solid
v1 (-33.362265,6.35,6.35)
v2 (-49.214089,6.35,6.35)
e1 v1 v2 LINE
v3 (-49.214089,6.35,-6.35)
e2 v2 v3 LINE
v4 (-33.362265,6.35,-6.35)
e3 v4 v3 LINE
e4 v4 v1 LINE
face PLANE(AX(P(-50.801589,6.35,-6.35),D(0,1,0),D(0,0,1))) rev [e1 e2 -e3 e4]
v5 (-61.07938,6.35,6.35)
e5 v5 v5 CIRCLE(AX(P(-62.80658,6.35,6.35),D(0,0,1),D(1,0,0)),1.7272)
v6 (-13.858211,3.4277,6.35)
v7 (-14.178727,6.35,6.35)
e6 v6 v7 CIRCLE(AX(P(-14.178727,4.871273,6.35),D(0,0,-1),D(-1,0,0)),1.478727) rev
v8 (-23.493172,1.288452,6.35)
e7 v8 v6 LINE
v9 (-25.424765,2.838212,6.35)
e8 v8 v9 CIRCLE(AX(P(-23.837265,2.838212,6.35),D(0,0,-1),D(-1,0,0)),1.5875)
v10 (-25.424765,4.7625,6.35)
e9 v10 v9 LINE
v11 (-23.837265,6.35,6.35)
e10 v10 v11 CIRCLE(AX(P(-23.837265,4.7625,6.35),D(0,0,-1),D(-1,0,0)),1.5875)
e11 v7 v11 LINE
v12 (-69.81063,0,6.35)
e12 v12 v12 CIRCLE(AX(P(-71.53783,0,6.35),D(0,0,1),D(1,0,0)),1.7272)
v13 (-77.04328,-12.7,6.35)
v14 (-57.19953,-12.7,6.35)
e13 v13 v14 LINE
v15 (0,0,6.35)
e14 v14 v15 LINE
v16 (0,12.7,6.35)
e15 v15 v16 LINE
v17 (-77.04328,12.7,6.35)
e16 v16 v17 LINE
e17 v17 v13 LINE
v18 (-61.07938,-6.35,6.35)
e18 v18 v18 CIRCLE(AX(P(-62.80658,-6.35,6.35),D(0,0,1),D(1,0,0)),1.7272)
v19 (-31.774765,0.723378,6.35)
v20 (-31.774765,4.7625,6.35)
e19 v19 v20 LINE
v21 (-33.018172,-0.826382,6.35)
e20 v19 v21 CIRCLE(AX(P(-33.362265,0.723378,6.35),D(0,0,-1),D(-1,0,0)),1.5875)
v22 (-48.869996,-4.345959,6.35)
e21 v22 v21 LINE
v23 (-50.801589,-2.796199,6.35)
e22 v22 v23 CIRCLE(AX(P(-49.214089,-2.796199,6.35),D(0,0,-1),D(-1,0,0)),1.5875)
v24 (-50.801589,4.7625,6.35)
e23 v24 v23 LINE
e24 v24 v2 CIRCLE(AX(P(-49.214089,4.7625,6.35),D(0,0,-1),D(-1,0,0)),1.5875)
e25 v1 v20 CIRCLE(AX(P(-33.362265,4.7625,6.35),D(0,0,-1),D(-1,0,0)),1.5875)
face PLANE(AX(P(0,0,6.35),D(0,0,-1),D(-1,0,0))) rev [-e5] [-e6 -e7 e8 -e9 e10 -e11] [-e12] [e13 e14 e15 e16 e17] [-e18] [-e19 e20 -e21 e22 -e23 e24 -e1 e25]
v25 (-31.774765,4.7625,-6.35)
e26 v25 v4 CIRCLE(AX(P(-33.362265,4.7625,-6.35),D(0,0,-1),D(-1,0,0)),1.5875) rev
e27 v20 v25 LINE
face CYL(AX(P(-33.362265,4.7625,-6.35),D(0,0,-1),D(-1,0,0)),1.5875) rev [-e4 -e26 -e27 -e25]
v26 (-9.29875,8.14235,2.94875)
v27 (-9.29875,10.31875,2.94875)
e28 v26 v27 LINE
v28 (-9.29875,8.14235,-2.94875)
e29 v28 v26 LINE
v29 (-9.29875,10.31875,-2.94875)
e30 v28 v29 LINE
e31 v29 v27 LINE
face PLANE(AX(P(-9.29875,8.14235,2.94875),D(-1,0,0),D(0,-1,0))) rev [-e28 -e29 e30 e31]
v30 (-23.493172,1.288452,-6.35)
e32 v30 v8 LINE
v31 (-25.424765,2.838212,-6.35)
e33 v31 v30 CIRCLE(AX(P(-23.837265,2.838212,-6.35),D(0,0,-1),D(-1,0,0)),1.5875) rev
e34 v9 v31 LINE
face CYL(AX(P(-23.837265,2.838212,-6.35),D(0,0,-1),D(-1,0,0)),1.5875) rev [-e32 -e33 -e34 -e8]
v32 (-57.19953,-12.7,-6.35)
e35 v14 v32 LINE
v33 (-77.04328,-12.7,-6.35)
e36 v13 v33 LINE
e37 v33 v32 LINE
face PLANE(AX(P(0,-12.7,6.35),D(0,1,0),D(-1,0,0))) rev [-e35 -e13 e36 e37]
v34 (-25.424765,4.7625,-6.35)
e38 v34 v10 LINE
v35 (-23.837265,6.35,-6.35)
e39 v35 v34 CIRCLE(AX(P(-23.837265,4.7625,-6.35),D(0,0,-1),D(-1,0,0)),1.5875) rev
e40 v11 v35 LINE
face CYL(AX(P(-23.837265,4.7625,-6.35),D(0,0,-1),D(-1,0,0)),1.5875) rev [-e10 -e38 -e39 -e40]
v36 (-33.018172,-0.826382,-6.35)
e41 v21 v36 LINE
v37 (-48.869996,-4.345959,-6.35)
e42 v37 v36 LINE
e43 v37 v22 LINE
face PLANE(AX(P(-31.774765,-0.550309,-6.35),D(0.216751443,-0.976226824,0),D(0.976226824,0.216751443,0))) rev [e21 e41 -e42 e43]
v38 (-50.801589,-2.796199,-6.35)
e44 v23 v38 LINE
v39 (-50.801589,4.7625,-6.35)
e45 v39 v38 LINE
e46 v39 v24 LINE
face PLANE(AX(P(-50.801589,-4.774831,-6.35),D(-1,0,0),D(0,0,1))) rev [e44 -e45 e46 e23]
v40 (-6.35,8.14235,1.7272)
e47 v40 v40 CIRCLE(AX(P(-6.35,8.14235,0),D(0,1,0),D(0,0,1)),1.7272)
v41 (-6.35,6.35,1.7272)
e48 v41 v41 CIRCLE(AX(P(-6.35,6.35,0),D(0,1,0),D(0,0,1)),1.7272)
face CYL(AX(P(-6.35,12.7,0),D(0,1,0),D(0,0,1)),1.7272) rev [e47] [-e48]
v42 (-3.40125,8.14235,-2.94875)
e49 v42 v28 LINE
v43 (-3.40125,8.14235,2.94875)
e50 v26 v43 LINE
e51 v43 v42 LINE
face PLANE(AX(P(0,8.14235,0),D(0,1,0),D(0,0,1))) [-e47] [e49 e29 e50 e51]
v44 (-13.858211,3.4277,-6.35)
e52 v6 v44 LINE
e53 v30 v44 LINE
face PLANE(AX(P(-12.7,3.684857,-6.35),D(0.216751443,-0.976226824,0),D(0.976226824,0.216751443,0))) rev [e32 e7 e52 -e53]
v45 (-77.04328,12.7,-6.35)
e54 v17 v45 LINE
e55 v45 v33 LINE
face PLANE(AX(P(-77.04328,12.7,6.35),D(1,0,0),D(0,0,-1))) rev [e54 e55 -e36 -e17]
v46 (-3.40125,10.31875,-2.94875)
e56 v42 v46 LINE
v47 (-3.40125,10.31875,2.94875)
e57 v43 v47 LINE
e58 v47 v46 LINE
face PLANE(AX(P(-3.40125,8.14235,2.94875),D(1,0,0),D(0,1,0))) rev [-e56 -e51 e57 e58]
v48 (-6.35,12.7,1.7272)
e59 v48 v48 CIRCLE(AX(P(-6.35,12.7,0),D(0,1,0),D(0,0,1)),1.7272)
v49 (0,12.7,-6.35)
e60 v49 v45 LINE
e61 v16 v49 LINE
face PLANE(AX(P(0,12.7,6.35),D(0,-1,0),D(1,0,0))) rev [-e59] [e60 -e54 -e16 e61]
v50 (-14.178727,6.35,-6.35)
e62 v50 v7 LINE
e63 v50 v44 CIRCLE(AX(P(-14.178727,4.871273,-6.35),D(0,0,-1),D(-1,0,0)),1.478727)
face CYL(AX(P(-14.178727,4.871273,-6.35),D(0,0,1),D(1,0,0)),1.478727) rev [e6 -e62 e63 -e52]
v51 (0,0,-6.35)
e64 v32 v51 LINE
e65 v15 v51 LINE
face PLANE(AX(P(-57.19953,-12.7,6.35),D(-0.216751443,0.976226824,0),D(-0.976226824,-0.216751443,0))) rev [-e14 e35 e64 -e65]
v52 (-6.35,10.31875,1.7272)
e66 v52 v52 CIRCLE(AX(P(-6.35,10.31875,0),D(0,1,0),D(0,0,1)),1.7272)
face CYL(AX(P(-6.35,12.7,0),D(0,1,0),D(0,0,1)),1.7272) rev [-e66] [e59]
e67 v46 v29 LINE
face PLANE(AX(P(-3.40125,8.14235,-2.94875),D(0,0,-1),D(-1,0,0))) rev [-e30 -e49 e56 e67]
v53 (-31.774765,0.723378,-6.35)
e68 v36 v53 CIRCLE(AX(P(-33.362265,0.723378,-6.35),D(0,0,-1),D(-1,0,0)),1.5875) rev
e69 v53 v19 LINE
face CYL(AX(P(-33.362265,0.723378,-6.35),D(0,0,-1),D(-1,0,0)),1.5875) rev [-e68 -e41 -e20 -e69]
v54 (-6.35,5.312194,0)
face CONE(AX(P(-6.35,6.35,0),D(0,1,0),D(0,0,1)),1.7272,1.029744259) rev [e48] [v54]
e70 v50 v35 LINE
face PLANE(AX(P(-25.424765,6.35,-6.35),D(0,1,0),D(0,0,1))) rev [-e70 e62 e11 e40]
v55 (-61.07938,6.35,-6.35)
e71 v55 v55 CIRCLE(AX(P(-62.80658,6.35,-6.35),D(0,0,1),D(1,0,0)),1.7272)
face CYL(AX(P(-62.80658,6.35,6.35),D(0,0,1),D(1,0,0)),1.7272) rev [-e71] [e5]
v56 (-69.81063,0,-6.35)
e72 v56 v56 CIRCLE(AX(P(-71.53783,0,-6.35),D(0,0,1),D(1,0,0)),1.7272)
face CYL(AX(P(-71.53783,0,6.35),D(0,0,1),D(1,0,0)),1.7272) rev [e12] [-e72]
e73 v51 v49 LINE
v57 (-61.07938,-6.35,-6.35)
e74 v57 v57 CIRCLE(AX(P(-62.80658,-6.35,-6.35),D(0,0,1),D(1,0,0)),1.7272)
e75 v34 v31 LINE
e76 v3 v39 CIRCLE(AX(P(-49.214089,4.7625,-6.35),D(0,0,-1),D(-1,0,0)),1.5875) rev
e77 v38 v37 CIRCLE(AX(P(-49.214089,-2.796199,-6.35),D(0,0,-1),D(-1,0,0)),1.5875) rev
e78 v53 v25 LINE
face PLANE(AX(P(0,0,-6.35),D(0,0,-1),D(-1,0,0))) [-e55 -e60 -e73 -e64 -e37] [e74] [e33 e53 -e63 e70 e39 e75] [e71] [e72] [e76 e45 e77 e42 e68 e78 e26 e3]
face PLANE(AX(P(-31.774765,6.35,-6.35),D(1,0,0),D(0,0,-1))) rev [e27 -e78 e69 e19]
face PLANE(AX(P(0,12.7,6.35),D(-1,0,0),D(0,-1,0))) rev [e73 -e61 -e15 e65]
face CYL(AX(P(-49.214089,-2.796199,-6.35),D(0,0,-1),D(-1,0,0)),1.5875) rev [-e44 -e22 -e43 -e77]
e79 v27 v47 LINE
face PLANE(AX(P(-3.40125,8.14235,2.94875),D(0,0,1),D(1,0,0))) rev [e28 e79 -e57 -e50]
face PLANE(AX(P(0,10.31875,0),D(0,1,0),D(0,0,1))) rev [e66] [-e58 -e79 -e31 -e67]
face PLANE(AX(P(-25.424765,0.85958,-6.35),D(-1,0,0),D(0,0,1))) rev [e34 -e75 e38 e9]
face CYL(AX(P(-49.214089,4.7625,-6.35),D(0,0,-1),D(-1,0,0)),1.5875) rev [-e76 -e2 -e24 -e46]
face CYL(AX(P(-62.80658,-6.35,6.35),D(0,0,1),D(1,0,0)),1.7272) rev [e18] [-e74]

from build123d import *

# Parameters (mm, degrees)
SKETCH1_W                 = 77.04328
SKETCH1_H                 = 25.4
BOSS_EXTRUDE1_DEPTH       = 6.35
CUT_EXTRUDE1_START        = -2.38125
SKETCH2_W                 = 5.8975
SKETCH2_H                 = 5.8975
CUT_EXTRUDE1_DEPTH        = 2.1764
F_4_CLEARANCE_HOLE1_D     = 3.4544
F_4_CLEARANCE_HOLE1_DEPTH = 6.35
F_4_CLEARANCE_HOLE1_TIP   = 1.037806461
F_4_CLEARANCE_HOLE2_D     = 3.4544
CUT_EXTRUDE2_DEPTH        = 80.109082874
CUT_EXTRUDE3_DEPTH        = 80.109082874
FILLET1_R                 = 1.5875
FILLET2_R                 = 1.478727


with BuildPart() as part:
    # Sketch1 → Boss-Extrude1 (new, symmetric)
    with BuildSketch(Plane.XY):
        with Locations((-38.52164, 0)):
            Rectangle(SKETCH1_W, SKETCH1_H)
    extrude(amount=BOSS_EXTRUDE1_DEPTH, both=True)

    # Sketch2 → Cut-Extrude1 (cut)
    with BuildSketch(Plane(origin=(0, 12.7, 0), x_dir=(1, 0, 0), z_dir=(0, 1, 0)).offset(CUT_EXTRUDE1_START)):
        with Locations((-6.350000199, 1.99e-07)):
            Rectangle(SKETCH2_W, SKETCH2_H)
    extrude(amount=-CUT_EXTRUDE1_DEPTH, mode=Mode.SUBTRACT)

    # #4 Clearance Hole1
    with Locations(Plane(origin=(0, 12.7, 0), x_dir=(1, 0, 0), z_dir=(0, 1, 0))):
        with Locations((-6.350000199, 1.99e-07)):
            Hole(F_4_CLEARANCE_HOLE1_D / 2, depth=F_4_CLEARANCE_HOLE1_DEPTH)
            with Locations((0, 0, -(F_4_CLEARANCE_HOLE1_DEPTH + F_4_CLEARANCE_HOLE1_TIP / 2))):  # 118° drill point
                Cone(0, F_4_CLEARANCE_HOLE1_D / 2, F_4_CLEARANCE_HOLE1_TIP, mode=Mode.SUBTRACT)

    # #4 Clearance Hole2 (through all)
    with Locations(Plane.XY.offset(6.35)):
        with Locations((-62.80658, -6.35), (-71.53783, 0), (-62.80658, 6.35)):
            Hole(F_4_CLEARANCE_HOLE2_D / 2)

    # Sketch8 → Cut-Extrude2 (cut, through all)
    with BuildSketch(Plane(origin=(0, 0, -6.35), x_dir=(-1, 0, 0), z_dir=(0, 0, -1))):
        Polygon((0, 0), (0, -12.7), (57.19953, -12.7), align=None)
    extrude(amount=-CUT_EXTRUDE2_DEPTH, mode=Mode.SUBTRACT)

    # Sketch9 → Cut-Extrude3 (cut, through all)
    with BuildSketch(Plane.XY.offset(6.35)):
        Polygon((-12.7, 3.684857438), (-25.424765, 0.859580456), (-25.424765, 6.35), (-12.7, 6.35), align=None)
        Polygon((-31.774765, -0.550308751), (-50.801588921, -4.774830592), (-50.801588921, 6.35), (-31.774765, 6.35), align=None)
    extrude(amount=-CUT_EXTRUDE3_DEPTH, mode=Mode.SUBTRACT)

    # Fillet1
    fillet1_edges = [part.edges().sort_by_distance(p)[0] for p in [
        (-25.424765, 0.859580456, 0),
        (-25.424765, 6.35, 0),
        (-31.774765, 6.35, 0),
        (-31.774765, -0.550308751, 0),
        (-50.801588921, -4.774830592, 0),
        (-50.801588921, 6.35, 0),
    ]]
    fillet(fillet1_edges, radius=FILLET1_R)

    # Fillet2
    fillet2_edges = [part.edges().sort_by_distance(p)[0] for p in [
        (-12.7, 6.35, 0),
        (-12.7, 3.684857438, 0),
    ]]
    fillet(fillet2_edges, radius=FILLET2_R - 0.0001)  # a hair under: the kernel refuses the full size


solid = part.part
